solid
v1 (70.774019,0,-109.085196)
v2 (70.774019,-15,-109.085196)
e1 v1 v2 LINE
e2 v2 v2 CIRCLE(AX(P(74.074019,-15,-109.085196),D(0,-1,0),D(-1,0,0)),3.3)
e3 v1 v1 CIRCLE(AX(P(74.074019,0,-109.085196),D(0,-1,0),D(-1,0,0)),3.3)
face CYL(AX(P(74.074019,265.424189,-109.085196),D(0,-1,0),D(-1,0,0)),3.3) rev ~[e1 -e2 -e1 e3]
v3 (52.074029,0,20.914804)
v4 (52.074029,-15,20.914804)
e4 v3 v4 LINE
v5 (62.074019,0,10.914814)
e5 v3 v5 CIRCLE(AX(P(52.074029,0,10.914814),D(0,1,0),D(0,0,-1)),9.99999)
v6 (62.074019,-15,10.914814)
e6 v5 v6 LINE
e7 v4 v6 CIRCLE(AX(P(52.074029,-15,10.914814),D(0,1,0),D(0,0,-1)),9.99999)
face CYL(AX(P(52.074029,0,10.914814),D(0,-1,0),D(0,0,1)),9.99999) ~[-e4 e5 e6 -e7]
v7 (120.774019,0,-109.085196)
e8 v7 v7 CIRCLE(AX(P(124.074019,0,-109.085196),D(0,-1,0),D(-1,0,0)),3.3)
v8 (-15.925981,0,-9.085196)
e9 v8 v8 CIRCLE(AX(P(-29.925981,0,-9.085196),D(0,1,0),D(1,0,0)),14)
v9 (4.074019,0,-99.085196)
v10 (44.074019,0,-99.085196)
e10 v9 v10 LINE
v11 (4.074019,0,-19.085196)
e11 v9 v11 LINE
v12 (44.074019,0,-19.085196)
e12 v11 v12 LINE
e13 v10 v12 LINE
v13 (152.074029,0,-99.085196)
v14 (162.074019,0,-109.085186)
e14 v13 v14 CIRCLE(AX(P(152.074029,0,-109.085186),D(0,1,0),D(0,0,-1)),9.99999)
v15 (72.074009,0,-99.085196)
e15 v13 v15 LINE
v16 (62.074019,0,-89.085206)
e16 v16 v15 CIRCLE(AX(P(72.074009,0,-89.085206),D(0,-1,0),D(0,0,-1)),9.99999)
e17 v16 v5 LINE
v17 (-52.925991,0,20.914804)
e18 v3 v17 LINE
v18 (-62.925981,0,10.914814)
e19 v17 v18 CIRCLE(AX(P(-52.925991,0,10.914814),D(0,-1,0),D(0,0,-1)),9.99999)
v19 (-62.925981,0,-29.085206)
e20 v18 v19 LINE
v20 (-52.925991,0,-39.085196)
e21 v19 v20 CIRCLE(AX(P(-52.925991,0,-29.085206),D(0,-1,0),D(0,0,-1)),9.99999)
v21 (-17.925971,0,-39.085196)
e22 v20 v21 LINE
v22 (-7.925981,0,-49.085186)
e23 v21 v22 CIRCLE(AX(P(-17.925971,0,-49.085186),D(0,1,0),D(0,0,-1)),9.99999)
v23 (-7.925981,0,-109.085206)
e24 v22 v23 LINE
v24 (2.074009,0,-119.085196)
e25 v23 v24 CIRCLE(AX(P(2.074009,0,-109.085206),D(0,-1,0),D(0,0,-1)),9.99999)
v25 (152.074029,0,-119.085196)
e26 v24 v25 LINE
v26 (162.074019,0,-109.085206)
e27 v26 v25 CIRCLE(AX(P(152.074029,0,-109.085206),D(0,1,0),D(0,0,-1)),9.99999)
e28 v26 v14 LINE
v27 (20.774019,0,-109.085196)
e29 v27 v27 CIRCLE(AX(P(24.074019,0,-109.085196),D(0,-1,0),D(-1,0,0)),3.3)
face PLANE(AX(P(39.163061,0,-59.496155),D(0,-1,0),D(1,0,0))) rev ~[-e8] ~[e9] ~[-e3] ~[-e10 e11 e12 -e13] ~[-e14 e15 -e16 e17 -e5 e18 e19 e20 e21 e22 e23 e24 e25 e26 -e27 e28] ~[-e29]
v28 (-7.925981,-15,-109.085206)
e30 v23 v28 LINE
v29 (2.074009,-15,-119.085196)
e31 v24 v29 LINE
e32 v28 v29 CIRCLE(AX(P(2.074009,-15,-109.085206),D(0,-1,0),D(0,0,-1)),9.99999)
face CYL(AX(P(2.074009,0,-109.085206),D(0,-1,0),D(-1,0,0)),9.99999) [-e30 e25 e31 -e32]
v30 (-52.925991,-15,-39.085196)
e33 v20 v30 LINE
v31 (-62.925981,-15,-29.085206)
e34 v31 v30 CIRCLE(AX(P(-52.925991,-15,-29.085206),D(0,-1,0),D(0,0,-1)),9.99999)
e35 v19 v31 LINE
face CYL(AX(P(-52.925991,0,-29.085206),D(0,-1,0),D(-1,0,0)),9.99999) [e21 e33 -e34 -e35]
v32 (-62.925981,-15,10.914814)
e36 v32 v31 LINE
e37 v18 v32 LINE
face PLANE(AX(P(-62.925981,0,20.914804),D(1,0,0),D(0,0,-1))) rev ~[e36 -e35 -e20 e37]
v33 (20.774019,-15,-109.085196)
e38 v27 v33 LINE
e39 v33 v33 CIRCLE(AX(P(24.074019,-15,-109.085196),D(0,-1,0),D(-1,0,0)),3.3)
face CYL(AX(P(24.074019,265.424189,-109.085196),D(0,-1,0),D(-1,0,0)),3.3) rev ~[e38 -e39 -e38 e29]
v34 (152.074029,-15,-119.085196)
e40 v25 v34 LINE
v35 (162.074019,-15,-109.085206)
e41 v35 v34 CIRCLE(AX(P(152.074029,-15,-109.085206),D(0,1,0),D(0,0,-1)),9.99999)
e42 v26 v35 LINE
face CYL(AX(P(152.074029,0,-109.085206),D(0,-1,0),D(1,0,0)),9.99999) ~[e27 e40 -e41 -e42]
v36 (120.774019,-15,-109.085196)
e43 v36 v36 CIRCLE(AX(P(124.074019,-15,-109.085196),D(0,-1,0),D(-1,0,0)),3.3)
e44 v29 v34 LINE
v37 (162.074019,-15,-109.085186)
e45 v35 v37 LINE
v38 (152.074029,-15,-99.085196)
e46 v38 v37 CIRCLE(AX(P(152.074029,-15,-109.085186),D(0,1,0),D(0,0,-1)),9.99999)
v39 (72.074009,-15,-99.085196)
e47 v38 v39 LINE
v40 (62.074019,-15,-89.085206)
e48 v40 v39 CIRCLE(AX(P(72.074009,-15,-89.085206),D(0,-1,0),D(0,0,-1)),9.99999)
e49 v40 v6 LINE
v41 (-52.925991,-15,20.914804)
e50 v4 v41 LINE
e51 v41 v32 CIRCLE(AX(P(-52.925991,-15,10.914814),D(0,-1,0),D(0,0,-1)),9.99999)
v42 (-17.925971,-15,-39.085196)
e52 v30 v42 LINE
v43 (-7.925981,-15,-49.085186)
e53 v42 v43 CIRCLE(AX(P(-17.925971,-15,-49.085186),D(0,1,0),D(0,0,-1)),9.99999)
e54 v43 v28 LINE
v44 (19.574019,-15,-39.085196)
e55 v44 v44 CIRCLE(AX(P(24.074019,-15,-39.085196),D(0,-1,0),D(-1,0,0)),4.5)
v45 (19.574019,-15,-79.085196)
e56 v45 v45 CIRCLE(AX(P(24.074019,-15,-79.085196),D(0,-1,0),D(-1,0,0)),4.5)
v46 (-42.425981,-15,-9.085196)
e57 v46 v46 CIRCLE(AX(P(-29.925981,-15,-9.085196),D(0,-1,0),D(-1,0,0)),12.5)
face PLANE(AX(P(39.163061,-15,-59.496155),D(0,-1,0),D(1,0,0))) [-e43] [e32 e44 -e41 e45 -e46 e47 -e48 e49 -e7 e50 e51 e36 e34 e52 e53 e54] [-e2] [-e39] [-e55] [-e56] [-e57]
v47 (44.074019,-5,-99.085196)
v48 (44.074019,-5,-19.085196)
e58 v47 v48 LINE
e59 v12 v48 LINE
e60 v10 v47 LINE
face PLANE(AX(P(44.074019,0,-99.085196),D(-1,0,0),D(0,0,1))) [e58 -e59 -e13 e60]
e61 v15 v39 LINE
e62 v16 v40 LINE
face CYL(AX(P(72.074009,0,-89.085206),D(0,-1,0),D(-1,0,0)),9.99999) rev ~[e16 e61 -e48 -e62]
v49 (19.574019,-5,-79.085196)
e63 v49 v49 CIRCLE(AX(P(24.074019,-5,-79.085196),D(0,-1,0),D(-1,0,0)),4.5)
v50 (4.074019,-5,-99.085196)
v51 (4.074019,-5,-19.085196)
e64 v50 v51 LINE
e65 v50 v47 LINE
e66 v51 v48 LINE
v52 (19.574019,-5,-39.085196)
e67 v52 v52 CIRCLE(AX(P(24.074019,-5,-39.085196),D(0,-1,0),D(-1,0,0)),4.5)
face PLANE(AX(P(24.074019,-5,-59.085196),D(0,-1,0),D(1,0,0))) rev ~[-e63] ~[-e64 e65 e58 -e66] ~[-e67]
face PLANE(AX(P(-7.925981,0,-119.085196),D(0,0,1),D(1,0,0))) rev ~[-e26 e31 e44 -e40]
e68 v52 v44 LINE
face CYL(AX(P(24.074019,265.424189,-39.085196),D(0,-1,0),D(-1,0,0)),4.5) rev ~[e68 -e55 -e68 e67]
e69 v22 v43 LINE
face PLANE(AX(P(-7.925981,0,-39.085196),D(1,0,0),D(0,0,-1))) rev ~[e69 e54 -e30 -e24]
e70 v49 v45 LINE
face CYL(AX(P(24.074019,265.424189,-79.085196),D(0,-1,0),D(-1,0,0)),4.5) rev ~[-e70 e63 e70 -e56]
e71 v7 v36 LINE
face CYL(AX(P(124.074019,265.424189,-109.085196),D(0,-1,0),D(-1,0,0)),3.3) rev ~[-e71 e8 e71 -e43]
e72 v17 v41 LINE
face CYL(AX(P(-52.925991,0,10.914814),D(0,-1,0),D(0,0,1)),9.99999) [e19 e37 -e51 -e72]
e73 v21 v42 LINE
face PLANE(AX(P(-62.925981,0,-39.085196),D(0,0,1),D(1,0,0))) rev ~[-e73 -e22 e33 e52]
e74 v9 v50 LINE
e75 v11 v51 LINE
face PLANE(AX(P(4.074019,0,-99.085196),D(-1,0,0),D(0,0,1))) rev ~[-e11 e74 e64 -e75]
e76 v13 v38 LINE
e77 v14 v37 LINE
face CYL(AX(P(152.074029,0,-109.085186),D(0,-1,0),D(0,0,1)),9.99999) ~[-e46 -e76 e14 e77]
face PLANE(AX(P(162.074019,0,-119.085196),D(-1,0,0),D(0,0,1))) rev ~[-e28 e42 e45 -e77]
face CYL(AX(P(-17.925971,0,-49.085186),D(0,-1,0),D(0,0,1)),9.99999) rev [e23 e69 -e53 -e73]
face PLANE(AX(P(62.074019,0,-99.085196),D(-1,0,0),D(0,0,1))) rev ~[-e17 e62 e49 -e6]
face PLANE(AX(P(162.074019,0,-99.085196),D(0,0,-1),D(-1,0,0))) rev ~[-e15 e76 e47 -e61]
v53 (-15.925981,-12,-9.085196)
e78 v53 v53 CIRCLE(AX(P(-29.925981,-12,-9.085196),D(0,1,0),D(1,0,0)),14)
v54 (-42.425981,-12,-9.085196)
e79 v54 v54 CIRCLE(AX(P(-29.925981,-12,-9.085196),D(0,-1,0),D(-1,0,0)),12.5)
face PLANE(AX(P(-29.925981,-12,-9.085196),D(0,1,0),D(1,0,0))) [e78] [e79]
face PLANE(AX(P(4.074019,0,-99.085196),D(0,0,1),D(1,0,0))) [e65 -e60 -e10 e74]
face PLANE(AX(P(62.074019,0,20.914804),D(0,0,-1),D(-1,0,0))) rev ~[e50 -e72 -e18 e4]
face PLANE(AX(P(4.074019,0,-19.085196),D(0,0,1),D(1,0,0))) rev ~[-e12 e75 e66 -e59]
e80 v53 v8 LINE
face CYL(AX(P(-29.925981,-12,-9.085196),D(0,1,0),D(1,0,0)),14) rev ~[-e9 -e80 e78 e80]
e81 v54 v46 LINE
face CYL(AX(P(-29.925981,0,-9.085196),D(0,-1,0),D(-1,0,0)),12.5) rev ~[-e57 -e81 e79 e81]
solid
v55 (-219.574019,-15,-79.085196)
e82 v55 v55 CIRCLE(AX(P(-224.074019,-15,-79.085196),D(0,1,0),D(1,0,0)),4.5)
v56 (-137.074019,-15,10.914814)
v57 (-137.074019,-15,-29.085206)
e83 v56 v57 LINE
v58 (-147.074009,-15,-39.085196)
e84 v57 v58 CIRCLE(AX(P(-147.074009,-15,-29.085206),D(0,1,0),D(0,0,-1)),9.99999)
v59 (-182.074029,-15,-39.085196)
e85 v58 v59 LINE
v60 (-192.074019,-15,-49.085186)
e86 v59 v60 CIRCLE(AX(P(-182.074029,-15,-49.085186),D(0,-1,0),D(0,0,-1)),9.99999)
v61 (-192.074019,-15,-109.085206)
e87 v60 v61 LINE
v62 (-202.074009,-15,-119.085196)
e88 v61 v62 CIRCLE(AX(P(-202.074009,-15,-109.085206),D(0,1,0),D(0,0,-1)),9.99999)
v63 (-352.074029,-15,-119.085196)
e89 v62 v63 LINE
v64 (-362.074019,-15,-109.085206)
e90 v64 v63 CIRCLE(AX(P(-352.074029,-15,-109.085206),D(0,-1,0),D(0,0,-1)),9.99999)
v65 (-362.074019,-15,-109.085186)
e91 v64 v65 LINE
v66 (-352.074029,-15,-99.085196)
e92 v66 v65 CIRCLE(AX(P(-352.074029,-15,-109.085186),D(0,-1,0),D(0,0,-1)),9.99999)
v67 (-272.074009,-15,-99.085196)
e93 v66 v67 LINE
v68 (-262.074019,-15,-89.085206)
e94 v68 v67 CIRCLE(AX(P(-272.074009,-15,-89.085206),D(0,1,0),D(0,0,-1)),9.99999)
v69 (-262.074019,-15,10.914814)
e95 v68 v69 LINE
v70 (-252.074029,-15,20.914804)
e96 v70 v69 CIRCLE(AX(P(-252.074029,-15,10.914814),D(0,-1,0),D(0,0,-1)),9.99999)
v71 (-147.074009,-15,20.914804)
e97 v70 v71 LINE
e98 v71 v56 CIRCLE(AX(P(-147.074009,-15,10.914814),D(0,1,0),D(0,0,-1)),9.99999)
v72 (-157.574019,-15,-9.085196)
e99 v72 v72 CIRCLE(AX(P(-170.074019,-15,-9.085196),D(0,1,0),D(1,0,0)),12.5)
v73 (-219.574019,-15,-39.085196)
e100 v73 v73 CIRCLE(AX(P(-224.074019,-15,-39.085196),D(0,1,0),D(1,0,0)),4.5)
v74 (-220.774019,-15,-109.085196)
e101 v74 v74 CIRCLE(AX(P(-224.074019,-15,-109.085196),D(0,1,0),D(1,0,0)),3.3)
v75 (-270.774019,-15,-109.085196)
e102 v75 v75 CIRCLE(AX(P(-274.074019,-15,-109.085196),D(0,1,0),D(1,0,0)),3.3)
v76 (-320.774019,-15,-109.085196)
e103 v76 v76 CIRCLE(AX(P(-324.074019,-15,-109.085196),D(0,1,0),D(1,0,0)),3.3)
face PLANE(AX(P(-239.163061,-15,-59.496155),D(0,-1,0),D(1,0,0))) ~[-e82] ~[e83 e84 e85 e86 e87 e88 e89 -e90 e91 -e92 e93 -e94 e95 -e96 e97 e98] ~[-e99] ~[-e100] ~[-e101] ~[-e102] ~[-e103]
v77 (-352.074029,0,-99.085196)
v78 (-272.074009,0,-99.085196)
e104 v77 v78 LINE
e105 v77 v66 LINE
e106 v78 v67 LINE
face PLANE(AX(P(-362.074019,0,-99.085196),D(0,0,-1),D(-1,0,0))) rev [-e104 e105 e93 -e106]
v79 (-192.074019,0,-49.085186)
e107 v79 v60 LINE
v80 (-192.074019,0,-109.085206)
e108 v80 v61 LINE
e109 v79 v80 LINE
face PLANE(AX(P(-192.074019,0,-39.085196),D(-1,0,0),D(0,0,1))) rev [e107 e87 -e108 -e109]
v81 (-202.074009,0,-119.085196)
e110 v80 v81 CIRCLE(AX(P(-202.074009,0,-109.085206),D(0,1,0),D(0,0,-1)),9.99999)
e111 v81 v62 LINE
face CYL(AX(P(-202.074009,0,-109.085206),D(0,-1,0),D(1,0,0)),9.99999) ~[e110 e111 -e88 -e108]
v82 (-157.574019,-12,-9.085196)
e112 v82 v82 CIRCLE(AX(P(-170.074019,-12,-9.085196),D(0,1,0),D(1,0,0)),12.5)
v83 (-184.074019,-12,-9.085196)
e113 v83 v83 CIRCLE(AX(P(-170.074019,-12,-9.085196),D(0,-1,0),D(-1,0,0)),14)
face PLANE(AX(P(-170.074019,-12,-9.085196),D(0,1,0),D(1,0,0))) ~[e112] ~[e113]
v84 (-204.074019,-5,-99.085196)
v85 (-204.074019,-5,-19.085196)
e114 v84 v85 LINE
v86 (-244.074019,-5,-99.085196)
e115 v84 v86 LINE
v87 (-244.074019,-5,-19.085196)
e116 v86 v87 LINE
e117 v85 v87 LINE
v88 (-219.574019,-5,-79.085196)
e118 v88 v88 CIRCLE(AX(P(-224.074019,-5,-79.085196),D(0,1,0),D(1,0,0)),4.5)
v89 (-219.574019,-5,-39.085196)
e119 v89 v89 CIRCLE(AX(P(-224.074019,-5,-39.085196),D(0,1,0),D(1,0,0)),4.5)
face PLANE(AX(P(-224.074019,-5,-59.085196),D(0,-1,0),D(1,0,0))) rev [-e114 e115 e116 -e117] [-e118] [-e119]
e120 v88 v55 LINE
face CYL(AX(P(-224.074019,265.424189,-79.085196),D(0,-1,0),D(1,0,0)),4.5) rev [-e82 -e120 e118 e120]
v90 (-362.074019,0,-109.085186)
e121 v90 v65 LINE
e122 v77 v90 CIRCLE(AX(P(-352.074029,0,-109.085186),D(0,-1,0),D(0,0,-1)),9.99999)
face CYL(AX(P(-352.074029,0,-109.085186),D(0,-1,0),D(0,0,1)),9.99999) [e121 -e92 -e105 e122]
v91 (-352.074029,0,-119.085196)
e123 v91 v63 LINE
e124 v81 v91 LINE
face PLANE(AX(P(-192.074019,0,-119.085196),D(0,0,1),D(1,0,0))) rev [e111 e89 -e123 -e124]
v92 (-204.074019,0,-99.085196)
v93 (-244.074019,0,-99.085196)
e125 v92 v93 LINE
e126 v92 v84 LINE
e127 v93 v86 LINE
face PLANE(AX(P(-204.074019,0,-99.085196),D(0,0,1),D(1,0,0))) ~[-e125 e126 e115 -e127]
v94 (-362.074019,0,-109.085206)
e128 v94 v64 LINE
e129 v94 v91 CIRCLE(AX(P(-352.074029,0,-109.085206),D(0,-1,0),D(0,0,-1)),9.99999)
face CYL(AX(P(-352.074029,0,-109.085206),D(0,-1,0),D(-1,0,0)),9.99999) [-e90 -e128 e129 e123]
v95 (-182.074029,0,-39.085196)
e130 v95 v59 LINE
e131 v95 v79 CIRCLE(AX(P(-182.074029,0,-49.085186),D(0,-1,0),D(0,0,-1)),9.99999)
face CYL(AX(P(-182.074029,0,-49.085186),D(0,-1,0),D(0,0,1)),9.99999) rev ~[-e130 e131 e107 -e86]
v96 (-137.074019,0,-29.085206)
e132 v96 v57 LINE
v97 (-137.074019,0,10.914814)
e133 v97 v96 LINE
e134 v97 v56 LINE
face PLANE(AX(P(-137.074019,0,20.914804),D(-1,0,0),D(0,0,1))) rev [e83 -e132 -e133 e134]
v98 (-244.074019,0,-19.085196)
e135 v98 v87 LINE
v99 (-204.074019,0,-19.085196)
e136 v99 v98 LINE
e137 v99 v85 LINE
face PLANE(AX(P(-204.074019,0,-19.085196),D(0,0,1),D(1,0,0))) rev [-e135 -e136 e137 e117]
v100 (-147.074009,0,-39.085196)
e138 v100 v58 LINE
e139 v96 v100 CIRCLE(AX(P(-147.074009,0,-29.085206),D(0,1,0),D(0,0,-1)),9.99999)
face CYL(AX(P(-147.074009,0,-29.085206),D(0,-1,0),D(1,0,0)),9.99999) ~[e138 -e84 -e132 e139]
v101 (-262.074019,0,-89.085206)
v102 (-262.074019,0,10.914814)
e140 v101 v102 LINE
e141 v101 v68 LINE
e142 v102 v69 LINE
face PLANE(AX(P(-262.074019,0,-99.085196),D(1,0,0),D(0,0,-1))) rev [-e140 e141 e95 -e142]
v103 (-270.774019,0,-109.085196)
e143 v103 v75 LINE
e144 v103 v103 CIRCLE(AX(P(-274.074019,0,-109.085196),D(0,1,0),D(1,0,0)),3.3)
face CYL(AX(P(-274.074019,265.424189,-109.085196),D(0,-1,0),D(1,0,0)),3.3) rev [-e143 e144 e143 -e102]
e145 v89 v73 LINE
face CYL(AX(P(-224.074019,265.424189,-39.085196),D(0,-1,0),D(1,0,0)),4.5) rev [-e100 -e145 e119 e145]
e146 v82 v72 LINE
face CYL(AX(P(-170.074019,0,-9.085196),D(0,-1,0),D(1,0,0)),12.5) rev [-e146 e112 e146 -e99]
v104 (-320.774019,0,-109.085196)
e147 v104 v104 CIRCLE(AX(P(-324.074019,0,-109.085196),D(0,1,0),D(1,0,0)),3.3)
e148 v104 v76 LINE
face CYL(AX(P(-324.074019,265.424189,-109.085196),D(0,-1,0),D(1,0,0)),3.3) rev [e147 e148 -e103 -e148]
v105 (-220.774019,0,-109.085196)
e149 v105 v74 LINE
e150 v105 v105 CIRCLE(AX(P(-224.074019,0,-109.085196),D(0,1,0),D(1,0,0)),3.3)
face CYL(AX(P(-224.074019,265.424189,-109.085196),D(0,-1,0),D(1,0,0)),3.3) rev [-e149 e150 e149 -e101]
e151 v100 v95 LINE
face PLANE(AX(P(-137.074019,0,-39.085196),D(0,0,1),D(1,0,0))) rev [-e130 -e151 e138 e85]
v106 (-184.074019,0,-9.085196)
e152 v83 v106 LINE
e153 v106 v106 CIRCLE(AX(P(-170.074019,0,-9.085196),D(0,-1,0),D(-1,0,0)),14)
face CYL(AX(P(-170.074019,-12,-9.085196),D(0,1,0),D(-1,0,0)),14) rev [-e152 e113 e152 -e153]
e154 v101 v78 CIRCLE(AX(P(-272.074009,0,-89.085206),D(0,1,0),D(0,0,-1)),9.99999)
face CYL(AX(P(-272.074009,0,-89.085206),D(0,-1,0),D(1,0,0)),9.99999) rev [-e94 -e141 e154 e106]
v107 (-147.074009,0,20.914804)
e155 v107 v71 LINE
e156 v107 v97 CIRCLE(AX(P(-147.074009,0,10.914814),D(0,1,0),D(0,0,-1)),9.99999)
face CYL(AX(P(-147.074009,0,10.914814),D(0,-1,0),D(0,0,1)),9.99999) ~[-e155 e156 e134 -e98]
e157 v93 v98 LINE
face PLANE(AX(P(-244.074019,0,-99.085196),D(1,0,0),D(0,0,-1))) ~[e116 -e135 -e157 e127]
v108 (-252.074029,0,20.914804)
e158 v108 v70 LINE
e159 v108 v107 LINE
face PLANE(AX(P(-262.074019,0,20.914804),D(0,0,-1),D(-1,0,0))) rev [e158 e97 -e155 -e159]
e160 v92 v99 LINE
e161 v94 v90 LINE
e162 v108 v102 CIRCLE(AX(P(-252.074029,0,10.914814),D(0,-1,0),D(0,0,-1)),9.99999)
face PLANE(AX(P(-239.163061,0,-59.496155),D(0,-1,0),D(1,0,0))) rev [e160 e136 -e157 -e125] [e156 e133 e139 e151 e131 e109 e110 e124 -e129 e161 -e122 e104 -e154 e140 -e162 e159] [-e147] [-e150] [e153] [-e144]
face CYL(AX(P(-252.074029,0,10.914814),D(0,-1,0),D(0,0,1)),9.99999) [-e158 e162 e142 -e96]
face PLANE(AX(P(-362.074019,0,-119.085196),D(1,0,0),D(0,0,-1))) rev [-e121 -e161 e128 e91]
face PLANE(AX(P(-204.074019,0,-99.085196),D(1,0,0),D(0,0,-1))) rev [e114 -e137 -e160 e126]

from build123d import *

# Parameters (mm, degrees)
F1_DEPTH       = 15
F2_D           = 9
F3_D           = 6.6
F4_R           = 9.99999
F5_D           = 25
F5_CBORE_D     = 28
F5_CBORE_DEPTH = 12
F6_W           = 40
F6_H           = 80
F7_DEPTH       = 5


# Not quite as in the source:
# - a fillet or chamfer is up to 0.001 mm smaller than in the source, because OpenCascade refuses the exact size


with BuildPart() as f1:
    # F0 (on Front) → F1 (new body)
    with BuildSketch(Plane.XZ):
        Polygon((62.0740194619, 20.9148037434), (-57.9259805381, 20.9148037434), (-62.9259805381, 20.9148037434), (-62.9259805381, -39.0851962566), (-57.9259805381, -39.0851962566), (-7.9259805381, -39.0851962566), (-7.9259805381, -119.0851962566), (162.0740194619, -119.0851962566), (162.0740194619, -99.0851962566), (62.0740194619, -99.0851962566), align=None)
    extrude(amount=F1_DEPTH)

    # F2 (through all)
    with Locations(Plane(origin=(0, 0, 0), x_dir=(1, 0, 0), z_dir=(0, 1, 0))):
        with Locations((24.0740194619, 79.0851962566), (24.0740194619, 39.0851962566)):
            Hole(F2_D / 2)

    # F3 (through all)
    with Locations(Plane(origin=(0, 0, 0), x_dir=(1, 0, 0), z_dir=(0, 1, 0))):
        with Locations((24.0740194619, 109.0851962566), (74.0740194619, 109.0851962566), (124.0740194619, 109.0851962566)):
            Hole(F3_D / 2)

    # F4 (radius 10 in the source; OpenCascade refuses exactly that, so slightly less here)
    f4_edges = [f1.edges().sort_by_distance(p)[0] for p in [
        (62.074019, -7.5, 20.914804),
        (62.074019, -7.5, -99.085196),
        (162.074019, -7.5, -119.085196),
        (162.074019, -7.5, -99.085196),
        (-7.925981, -7.5, -119.085196),
        (-7.925981, -7.5, -39.085196),
        (-62.925981, -7.5, 20.914804),
        (-62.925981, -7.5, -39.085196),
    ]]
    fillet(f4_edges, radius=F4_R)

    # F5 (through all)
    with Locations(Plane(origin=(0, 0, 0), x_dir=(1, 0, 0), z_dir=(0, 1, 0))):
        with Locations((-29.9259805381, 9.0851962566)):
            CounterBoreHole(F5_D / 2, F5_CBORE_D / 2, F5_CBORE_DEPTH)

    # F6 (on face) → F7 (cut)
    with BuildSketch(Plane.XZ):
        with Locations((24.0740194619, -59.0851962566)):
            Rectangle(F6_W, F6_H)
    extrude(amount=F7_DEPTH, mode=Mode.SUBTRACT)


with BuildPart() as f9_1:
    # F9: instance of F1
    add(f1.part.mirror(Plane.YZ.offset(-100)))


solid = Compound([f1.part, f9_1.part])
